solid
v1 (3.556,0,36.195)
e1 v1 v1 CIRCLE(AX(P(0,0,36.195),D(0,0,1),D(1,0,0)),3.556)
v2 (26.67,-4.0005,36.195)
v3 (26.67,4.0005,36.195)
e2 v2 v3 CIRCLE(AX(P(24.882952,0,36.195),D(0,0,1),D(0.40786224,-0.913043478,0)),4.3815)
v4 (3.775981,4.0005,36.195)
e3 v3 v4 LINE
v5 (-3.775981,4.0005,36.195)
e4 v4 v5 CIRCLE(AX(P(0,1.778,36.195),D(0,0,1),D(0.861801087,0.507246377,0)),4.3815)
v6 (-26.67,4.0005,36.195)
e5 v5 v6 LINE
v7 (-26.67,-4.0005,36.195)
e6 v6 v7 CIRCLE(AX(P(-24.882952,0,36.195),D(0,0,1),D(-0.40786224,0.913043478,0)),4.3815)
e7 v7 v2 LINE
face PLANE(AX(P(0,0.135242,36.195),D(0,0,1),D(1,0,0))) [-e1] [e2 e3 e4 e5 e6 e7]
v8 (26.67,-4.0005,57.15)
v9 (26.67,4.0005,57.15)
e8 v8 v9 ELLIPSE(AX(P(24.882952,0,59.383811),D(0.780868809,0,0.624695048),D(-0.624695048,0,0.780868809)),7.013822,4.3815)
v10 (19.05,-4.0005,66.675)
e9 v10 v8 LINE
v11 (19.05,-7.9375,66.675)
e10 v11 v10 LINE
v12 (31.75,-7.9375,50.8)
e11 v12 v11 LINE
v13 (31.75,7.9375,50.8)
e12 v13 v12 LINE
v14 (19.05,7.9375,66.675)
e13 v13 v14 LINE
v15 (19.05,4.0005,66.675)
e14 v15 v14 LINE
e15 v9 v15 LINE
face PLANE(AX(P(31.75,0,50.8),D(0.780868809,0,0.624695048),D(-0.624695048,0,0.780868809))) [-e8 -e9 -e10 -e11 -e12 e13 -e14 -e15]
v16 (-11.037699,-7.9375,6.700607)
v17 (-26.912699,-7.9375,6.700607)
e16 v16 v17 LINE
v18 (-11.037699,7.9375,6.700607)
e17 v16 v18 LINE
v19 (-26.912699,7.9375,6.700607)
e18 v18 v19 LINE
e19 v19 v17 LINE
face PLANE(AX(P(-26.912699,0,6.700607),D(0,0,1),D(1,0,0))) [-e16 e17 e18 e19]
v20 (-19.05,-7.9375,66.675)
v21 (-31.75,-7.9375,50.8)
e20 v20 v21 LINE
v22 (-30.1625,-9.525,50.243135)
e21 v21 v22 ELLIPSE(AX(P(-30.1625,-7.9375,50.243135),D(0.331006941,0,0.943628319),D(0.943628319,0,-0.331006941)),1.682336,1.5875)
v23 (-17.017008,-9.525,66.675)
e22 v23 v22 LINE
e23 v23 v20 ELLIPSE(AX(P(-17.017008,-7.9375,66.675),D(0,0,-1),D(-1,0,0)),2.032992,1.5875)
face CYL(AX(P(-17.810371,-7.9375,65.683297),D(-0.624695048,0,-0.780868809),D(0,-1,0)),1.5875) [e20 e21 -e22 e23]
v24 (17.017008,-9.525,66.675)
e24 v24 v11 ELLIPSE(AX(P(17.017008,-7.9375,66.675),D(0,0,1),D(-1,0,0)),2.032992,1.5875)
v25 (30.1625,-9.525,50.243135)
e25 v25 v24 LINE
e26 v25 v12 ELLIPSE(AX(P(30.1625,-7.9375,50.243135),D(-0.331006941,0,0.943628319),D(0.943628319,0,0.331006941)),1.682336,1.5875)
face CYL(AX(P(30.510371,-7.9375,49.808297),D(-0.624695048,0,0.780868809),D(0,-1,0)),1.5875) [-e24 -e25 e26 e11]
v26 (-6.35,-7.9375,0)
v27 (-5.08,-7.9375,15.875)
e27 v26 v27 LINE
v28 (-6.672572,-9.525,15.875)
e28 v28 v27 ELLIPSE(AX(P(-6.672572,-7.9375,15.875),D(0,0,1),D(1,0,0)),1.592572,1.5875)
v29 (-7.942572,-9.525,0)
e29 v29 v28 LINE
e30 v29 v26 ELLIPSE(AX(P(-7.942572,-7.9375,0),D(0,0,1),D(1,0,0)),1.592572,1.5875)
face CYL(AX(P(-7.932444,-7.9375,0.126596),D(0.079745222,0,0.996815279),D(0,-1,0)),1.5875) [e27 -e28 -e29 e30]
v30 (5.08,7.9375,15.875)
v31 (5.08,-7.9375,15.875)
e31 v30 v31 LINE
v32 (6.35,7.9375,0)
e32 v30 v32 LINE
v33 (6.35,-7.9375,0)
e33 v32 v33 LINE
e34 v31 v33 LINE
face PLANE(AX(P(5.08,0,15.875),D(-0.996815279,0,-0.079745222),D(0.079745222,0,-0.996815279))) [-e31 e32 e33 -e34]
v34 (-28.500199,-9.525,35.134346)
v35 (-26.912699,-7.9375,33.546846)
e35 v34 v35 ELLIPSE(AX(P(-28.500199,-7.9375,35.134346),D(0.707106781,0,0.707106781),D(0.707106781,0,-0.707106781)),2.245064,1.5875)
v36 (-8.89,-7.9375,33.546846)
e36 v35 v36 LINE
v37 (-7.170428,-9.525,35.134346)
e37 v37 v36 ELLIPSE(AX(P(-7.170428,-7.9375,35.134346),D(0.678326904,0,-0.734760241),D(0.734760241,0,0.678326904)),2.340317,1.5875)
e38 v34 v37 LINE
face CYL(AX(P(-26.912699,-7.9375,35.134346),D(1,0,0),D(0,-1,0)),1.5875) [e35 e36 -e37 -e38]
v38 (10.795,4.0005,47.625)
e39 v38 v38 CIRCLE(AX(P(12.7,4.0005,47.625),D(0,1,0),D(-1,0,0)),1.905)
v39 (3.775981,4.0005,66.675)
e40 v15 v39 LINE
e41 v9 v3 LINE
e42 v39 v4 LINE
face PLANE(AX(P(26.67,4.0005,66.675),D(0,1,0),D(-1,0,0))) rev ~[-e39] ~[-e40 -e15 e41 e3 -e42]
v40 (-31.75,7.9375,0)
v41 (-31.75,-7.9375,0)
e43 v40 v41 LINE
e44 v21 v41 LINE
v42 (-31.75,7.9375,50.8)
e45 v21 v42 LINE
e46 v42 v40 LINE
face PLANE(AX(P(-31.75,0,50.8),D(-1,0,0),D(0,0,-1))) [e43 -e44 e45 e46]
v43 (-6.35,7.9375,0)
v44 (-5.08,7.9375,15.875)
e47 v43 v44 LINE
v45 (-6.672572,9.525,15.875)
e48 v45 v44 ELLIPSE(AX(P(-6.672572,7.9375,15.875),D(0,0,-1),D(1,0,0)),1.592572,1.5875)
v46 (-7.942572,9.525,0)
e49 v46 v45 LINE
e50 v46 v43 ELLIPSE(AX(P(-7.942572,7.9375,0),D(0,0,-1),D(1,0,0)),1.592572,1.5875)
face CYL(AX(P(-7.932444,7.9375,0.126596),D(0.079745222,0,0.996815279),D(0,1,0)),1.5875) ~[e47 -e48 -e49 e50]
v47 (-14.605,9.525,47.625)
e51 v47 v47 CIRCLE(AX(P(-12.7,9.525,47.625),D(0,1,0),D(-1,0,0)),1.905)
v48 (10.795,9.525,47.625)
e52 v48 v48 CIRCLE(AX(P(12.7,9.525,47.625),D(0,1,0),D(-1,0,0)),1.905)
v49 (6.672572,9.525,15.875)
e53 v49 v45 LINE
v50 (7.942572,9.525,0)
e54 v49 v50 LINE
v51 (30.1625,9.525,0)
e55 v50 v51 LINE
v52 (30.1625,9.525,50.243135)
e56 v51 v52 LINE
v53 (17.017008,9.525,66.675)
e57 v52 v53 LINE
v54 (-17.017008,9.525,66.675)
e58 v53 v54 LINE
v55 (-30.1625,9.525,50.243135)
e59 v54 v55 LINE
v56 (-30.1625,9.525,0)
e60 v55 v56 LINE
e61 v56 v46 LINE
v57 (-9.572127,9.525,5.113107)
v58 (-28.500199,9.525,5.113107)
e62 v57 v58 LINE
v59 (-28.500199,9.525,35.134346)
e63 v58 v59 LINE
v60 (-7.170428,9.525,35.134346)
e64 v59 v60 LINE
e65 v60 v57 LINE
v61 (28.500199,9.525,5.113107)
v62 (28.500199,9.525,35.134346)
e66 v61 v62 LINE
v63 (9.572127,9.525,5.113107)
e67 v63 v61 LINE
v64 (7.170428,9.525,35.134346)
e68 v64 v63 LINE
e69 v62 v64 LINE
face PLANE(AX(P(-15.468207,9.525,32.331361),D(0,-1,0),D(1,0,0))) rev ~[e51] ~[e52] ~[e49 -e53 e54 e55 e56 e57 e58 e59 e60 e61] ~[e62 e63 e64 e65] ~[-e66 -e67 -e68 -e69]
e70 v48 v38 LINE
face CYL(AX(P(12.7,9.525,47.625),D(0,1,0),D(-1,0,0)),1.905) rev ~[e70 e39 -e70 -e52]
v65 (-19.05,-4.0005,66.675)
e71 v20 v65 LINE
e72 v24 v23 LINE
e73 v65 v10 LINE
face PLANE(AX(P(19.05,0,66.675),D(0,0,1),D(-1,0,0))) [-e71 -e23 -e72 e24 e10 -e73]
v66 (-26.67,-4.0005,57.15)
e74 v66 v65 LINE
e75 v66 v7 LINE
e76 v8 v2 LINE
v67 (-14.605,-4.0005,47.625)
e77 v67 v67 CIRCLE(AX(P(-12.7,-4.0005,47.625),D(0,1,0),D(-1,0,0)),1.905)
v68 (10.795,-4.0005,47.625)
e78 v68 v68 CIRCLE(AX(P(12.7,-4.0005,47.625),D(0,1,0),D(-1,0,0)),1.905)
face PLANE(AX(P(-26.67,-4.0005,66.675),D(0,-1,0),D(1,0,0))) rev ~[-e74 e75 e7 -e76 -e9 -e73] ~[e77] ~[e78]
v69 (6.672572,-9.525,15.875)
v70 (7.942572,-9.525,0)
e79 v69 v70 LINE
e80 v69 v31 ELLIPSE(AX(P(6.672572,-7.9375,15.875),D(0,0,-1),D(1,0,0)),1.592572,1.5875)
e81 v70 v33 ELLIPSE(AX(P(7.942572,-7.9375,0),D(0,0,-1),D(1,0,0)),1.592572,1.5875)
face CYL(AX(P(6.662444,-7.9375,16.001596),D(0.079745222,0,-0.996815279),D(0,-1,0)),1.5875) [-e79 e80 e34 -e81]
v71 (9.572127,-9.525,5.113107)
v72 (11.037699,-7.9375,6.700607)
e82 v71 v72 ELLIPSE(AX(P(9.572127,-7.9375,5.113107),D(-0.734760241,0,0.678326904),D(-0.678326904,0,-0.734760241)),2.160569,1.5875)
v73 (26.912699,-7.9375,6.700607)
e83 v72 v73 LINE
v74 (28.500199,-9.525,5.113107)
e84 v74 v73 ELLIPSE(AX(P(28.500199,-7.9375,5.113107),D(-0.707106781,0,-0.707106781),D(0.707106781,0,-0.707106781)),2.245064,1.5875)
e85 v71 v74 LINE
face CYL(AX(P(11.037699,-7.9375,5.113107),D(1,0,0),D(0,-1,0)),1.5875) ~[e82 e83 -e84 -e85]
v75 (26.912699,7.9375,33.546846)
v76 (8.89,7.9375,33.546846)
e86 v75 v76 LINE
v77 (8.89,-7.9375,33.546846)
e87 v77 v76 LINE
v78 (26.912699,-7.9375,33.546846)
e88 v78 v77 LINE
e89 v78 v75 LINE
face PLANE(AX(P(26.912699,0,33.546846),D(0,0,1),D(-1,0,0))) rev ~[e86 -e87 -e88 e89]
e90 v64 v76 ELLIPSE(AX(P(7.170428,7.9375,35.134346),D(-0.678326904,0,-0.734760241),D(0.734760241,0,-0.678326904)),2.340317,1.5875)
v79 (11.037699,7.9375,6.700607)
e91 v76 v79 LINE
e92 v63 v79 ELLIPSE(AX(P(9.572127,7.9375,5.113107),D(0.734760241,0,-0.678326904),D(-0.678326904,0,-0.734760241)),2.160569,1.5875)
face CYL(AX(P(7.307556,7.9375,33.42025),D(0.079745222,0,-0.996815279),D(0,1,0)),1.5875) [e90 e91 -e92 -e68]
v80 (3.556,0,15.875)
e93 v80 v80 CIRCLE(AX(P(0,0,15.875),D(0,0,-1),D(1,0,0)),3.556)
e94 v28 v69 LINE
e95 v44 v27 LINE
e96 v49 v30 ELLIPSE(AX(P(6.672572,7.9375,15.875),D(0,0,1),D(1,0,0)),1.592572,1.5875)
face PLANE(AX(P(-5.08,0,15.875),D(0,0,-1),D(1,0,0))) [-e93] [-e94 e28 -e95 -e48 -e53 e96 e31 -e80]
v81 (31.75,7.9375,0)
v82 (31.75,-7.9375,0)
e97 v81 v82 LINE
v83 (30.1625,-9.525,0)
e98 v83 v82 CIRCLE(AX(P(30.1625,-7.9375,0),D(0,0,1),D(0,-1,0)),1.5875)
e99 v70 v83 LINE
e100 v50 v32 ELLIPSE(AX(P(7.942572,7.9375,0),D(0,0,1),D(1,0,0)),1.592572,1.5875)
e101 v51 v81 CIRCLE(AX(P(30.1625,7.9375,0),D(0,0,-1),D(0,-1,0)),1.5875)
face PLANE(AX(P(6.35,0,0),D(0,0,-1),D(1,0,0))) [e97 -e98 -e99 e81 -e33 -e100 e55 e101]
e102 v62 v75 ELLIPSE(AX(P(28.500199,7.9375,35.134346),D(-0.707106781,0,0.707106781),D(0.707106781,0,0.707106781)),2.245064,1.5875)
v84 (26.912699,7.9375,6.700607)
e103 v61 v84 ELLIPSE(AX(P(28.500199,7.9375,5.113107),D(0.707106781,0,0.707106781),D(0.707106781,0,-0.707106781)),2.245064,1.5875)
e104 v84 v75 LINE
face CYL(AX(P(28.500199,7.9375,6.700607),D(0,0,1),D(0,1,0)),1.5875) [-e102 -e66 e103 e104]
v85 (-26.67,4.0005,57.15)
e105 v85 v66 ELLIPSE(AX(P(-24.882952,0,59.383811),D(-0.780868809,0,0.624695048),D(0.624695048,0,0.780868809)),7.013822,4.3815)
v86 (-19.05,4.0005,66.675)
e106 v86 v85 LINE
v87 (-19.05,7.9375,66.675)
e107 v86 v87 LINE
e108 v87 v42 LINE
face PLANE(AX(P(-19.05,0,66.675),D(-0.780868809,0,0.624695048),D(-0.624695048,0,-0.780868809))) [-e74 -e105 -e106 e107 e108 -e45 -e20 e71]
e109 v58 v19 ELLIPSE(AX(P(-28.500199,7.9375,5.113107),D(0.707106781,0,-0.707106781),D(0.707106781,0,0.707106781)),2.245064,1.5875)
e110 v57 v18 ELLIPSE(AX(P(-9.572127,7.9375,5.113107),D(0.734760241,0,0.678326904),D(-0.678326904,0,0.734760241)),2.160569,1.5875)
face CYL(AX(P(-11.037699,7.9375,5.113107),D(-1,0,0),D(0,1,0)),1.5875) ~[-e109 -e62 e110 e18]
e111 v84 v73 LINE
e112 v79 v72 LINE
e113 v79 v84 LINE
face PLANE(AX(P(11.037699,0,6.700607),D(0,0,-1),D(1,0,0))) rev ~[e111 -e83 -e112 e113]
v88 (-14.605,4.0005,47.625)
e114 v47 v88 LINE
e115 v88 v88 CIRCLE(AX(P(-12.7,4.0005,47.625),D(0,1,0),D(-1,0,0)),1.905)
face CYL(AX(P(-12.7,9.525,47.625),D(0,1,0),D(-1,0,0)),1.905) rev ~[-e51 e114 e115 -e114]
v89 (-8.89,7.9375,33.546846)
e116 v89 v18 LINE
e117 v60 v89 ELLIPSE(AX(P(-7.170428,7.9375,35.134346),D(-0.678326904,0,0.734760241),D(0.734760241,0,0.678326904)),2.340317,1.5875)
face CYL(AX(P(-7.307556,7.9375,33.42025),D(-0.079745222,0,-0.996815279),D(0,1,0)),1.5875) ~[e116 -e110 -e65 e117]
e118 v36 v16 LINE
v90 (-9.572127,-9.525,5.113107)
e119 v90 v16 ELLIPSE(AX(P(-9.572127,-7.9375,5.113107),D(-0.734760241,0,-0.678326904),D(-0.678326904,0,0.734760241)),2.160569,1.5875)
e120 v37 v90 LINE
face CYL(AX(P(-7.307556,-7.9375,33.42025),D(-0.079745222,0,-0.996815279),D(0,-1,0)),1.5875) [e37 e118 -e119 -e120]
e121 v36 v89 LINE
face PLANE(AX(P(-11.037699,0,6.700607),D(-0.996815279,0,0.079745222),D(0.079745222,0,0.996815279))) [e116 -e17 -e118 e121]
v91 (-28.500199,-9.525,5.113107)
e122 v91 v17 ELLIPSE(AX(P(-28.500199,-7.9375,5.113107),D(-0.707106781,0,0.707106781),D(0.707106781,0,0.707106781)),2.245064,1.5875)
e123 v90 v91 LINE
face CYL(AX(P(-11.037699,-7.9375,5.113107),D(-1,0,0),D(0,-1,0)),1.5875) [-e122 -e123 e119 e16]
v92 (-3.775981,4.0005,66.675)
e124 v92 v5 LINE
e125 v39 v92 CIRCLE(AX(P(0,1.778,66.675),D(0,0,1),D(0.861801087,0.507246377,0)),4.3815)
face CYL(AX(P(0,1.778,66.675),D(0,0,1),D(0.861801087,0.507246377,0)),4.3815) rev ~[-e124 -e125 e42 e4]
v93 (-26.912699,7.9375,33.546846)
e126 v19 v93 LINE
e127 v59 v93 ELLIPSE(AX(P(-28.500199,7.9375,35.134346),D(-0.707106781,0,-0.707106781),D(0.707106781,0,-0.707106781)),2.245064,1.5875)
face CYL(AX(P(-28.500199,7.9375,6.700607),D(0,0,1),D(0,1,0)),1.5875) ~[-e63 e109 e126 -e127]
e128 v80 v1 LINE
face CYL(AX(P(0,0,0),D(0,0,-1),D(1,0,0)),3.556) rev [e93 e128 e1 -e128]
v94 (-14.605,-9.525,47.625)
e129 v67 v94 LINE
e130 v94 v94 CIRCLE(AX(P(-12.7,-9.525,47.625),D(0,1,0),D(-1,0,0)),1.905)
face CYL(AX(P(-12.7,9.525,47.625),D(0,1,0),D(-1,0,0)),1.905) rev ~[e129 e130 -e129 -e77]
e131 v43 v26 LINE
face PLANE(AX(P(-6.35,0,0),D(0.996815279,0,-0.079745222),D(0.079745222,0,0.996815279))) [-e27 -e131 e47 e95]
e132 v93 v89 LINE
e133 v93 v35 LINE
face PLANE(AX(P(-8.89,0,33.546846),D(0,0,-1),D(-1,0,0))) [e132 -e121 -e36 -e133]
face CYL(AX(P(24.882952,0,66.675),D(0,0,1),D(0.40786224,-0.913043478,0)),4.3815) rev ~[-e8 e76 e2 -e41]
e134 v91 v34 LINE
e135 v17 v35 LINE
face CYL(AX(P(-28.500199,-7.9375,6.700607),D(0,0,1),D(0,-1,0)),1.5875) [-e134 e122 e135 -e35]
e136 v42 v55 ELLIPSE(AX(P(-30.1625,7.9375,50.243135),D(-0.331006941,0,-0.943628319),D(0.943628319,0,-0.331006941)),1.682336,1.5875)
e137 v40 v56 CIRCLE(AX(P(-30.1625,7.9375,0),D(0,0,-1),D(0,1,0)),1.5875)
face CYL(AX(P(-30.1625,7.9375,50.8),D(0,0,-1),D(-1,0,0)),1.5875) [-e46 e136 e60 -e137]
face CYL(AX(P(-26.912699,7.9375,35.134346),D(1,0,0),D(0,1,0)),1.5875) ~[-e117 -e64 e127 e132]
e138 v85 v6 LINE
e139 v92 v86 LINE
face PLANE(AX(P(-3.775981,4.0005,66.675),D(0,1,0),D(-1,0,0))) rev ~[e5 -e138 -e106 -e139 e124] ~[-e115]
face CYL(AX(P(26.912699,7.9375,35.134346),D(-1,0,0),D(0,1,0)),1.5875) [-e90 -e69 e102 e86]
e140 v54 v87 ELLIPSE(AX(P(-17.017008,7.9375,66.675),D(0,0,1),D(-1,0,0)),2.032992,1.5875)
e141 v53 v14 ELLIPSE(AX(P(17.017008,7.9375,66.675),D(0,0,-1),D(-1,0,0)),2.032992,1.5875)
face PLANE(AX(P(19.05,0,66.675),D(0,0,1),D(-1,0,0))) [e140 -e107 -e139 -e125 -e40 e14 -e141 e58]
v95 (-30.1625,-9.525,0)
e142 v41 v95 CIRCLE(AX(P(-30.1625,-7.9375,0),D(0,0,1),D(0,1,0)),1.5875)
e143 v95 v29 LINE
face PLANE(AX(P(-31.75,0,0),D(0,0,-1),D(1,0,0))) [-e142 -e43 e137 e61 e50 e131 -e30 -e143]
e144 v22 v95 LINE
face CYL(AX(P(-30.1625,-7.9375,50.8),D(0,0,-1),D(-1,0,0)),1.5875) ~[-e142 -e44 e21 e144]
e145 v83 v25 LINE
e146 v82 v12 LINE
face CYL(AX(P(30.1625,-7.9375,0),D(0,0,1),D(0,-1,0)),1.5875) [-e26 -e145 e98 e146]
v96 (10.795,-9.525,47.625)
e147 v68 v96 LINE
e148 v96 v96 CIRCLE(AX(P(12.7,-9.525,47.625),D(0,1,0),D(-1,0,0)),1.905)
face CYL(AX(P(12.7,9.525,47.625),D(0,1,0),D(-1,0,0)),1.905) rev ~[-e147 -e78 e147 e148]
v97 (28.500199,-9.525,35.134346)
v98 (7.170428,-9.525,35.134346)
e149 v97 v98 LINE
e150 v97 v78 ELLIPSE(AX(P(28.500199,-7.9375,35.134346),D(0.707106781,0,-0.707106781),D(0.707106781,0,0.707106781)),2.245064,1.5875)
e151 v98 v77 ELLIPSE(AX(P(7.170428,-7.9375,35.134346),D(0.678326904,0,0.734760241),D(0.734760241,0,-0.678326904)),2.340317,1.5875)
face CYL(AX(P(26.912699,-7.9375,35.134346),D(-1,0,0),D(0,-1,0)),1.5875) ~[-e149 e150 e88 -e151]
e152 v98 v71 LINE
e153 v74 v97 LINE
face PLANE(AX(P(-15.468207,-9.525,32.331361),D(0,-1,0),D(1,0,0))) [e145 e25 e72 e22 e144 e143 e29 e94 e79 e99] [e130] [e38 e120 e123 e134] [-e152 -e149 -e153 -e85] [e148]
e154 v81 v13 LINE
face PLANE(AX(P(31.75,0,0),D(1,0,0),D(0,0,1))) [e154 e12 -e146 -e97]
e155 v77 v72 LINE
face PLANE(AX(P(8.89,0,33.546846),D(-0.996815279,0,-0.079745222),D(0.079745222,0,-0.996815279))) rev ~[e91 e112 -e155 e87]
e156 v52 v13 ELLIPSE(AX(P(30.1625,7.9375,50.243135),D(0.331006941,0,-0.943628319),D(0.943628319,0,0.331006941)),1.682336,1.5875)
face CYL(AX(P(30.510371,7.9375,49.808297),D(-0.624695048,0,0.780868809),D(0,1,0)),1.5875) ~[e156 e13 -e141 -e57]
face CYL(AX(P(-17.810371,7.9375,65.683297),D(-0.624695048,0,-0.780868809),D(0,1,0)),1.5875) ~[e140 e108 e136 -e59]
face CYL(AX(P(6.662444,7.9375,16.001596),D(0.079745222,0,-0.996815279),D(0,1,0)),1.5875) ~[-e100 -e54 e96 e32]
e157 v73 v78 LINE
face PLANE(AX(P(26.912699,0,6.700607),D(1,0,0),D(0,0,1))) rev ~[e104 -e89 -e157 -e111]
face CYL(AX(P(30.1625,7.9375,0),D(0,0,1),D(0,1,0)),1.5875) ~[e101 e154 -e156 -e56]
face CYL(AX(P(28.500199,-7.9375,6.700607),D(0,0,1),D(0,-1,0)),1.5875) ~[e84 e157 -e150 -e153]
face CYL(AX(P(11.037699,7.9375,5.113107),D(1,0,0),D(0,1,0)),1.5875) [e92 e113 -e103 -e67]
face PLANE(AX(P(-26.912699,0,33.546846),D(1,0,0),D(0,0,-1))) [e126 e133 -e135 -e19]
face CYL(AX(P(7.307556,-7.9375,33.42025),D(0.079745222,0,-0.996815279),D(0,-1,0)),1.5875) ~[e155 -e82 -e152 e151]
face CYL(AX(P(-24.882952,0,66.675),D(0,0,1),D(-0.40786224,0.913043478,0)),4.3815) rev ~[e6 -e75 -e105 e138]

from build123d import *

# Parameters (mm, degrees)
F1_DEPTH  = 9.525
F3_DEPTH  = 30.48
F4_R      = 3.556
F5_DEPTH  = 36.195
F7_DEPTH  = 12.7
F8_R      = 1.5875
F9_R      = 1.905
F10_DEPTH = 19.05


# Not quite as in the source:
# - a feature names something its author has since deleted; it is built from what else it names


with BuildPart() as f1:
    # F0 (on Front) → F1 (new body, symmetric)
    with BuildSketch(Plane.XZ):
        Polygon((-31.75, 50.8), (-31.75, 0), (-6.35, 0), (-5.08, 15.875), (0, 15.875), (0, 66.675), (-19.05, 66.675), align=None)
        Polygon((19.05, 66.675), (0, 66.675), (0, 15.875), (5.08, 15.875), (6.35, 0), (31.75, 0), (31.75, 50.8), align=None)
    extrude(amount=F1_DEPTH, both=True)

    # F2 (on face) → F3 (cut)
    with BuildSketch(Plane.XY.offset(66.675)):
        with BuildLine():
            Line((26.67, -4.0005), (26.67, 4.0005))
            Line((26.67, 4.0005), (3.7759814618, 4.0005))
            ThreePointArc((3.7759814618, 4.0005), (0, 6.1595), (-3.7759814618, 4.0005))
            Line((-3.7759814618, 4.0005), (-26.67, 4.0005))
            Line((-26.67, 4.0005), (-26.67, -4.0005))
            Line((-26.67, -4.0005), (26.67, -4.0005))
        make_face()
        with BuildLine():
            ThreePointArc((26.67, -4.0005), (29.2644515955, 0), (26.67, 4.0005))
            Line((26.67, 4.0005), (26.67, -4.0005))
        make_face()
        with BuildLine():
            ThreePointArc((-26.67, 4.0005), (-29.2644515955, 0), (-26.67, -4.0005))
            Line((-26.67, -4.0005), (-26.67, 4.0005))
        make_face()
    extrude(amount=-F3_DEPTH, mode=Mode.SUBTRACT)

    # F4 (on Top) → F5 (cut, through all)
    with BuildSketch(Plane.XY):
        Circle(F4_R)
    extrude(amount=F5_DEPTH, mode=Mode.SUBTRACT)

    # F6 (on Front) → F7 (cut, symmetric)
    with BuildSketch(Plane.XZ):
        Polygon((-8.89, 33.5468458159), (-26.9126990667, 33.5468458159), (-26.9126990667, 6.7006074823), (-11.0376990667, 6.7006074823), align=None)
        Polygon((8.89, 33.5468458159), (11.0376990667, 6.7006074823), (26.9126990667, 6.7006074823), (26.9126990667, 33.5468458159), align=None)
    extrude(amount=F7_DEPTH, both=True, mode=Mode.SUBTRACT)

    # F8
    f8_edges = [f1.edges().sort_by_distance(p)[0] for p in [
        (31.75, 9.525, 25.4),
        (25.4, 9.525, 58.7375),
        (31.75, -9.525, 25.4),
        (25.4, -9.525, 58.7375),
        (5.715, 9.525, 7.9375),
        (5.715, -9.525, 7.9375),
        (-5.715, -9.525, 7.9375),
        (-5.715, 9.525, 7.9375),
        (-31.75, 9.525, 25.4),
        (-31.75, -9.525, 25.4),
        (-25.4, 9.525, 58.7375),
        (-25.4, -9.525, 58.7375),
        (-17.90135, 9.525, 33.546846),
        (-26.912699, 9.525, 20.123727),
        (-18.975199, 9.525, 6.700607),
        (-9.96385, 9.525, 20.123727),
        (9.96385, 9.525, 20.123727),
        (18.975199, 9.525, 6.700607),
        (26.912699, 9.525, 20.123727),
        (17.90135, 9.525, 33.546846),
        (-17.90135, -9.525, 33.546846),
        (-26.912699, -9.525, 20.123727),
        (-18.975199, -9.525, 6.700607),
        (-9.96385, -9.525, 20.123727),
        (9.96385, -9.525, 20.123727),
        (18.975199, -9.525, 6.700607),
        (26.912699, -9.525, 20.123727),
        (17.90135, -9.525, 33.546846),
    ]]
    fillet(f8_edges, radius=F8_R)

    # F9 (on face) → F10 (cut, through all)
    with BuildSketch(Plane(origin=(0, 9.525, 0), x_dir=(-1, 0, 0), z_dir=(0, 1, 0))):
        with Locations((-12.7, 47.625)):
            Circle(F9_R)
        with Locations((12.7, 47.625)):
            Circle(F9_R)
    extrude(amount=-F10_DEPTH, mode=Mode.SUBTRACT)


solid = f1.part
